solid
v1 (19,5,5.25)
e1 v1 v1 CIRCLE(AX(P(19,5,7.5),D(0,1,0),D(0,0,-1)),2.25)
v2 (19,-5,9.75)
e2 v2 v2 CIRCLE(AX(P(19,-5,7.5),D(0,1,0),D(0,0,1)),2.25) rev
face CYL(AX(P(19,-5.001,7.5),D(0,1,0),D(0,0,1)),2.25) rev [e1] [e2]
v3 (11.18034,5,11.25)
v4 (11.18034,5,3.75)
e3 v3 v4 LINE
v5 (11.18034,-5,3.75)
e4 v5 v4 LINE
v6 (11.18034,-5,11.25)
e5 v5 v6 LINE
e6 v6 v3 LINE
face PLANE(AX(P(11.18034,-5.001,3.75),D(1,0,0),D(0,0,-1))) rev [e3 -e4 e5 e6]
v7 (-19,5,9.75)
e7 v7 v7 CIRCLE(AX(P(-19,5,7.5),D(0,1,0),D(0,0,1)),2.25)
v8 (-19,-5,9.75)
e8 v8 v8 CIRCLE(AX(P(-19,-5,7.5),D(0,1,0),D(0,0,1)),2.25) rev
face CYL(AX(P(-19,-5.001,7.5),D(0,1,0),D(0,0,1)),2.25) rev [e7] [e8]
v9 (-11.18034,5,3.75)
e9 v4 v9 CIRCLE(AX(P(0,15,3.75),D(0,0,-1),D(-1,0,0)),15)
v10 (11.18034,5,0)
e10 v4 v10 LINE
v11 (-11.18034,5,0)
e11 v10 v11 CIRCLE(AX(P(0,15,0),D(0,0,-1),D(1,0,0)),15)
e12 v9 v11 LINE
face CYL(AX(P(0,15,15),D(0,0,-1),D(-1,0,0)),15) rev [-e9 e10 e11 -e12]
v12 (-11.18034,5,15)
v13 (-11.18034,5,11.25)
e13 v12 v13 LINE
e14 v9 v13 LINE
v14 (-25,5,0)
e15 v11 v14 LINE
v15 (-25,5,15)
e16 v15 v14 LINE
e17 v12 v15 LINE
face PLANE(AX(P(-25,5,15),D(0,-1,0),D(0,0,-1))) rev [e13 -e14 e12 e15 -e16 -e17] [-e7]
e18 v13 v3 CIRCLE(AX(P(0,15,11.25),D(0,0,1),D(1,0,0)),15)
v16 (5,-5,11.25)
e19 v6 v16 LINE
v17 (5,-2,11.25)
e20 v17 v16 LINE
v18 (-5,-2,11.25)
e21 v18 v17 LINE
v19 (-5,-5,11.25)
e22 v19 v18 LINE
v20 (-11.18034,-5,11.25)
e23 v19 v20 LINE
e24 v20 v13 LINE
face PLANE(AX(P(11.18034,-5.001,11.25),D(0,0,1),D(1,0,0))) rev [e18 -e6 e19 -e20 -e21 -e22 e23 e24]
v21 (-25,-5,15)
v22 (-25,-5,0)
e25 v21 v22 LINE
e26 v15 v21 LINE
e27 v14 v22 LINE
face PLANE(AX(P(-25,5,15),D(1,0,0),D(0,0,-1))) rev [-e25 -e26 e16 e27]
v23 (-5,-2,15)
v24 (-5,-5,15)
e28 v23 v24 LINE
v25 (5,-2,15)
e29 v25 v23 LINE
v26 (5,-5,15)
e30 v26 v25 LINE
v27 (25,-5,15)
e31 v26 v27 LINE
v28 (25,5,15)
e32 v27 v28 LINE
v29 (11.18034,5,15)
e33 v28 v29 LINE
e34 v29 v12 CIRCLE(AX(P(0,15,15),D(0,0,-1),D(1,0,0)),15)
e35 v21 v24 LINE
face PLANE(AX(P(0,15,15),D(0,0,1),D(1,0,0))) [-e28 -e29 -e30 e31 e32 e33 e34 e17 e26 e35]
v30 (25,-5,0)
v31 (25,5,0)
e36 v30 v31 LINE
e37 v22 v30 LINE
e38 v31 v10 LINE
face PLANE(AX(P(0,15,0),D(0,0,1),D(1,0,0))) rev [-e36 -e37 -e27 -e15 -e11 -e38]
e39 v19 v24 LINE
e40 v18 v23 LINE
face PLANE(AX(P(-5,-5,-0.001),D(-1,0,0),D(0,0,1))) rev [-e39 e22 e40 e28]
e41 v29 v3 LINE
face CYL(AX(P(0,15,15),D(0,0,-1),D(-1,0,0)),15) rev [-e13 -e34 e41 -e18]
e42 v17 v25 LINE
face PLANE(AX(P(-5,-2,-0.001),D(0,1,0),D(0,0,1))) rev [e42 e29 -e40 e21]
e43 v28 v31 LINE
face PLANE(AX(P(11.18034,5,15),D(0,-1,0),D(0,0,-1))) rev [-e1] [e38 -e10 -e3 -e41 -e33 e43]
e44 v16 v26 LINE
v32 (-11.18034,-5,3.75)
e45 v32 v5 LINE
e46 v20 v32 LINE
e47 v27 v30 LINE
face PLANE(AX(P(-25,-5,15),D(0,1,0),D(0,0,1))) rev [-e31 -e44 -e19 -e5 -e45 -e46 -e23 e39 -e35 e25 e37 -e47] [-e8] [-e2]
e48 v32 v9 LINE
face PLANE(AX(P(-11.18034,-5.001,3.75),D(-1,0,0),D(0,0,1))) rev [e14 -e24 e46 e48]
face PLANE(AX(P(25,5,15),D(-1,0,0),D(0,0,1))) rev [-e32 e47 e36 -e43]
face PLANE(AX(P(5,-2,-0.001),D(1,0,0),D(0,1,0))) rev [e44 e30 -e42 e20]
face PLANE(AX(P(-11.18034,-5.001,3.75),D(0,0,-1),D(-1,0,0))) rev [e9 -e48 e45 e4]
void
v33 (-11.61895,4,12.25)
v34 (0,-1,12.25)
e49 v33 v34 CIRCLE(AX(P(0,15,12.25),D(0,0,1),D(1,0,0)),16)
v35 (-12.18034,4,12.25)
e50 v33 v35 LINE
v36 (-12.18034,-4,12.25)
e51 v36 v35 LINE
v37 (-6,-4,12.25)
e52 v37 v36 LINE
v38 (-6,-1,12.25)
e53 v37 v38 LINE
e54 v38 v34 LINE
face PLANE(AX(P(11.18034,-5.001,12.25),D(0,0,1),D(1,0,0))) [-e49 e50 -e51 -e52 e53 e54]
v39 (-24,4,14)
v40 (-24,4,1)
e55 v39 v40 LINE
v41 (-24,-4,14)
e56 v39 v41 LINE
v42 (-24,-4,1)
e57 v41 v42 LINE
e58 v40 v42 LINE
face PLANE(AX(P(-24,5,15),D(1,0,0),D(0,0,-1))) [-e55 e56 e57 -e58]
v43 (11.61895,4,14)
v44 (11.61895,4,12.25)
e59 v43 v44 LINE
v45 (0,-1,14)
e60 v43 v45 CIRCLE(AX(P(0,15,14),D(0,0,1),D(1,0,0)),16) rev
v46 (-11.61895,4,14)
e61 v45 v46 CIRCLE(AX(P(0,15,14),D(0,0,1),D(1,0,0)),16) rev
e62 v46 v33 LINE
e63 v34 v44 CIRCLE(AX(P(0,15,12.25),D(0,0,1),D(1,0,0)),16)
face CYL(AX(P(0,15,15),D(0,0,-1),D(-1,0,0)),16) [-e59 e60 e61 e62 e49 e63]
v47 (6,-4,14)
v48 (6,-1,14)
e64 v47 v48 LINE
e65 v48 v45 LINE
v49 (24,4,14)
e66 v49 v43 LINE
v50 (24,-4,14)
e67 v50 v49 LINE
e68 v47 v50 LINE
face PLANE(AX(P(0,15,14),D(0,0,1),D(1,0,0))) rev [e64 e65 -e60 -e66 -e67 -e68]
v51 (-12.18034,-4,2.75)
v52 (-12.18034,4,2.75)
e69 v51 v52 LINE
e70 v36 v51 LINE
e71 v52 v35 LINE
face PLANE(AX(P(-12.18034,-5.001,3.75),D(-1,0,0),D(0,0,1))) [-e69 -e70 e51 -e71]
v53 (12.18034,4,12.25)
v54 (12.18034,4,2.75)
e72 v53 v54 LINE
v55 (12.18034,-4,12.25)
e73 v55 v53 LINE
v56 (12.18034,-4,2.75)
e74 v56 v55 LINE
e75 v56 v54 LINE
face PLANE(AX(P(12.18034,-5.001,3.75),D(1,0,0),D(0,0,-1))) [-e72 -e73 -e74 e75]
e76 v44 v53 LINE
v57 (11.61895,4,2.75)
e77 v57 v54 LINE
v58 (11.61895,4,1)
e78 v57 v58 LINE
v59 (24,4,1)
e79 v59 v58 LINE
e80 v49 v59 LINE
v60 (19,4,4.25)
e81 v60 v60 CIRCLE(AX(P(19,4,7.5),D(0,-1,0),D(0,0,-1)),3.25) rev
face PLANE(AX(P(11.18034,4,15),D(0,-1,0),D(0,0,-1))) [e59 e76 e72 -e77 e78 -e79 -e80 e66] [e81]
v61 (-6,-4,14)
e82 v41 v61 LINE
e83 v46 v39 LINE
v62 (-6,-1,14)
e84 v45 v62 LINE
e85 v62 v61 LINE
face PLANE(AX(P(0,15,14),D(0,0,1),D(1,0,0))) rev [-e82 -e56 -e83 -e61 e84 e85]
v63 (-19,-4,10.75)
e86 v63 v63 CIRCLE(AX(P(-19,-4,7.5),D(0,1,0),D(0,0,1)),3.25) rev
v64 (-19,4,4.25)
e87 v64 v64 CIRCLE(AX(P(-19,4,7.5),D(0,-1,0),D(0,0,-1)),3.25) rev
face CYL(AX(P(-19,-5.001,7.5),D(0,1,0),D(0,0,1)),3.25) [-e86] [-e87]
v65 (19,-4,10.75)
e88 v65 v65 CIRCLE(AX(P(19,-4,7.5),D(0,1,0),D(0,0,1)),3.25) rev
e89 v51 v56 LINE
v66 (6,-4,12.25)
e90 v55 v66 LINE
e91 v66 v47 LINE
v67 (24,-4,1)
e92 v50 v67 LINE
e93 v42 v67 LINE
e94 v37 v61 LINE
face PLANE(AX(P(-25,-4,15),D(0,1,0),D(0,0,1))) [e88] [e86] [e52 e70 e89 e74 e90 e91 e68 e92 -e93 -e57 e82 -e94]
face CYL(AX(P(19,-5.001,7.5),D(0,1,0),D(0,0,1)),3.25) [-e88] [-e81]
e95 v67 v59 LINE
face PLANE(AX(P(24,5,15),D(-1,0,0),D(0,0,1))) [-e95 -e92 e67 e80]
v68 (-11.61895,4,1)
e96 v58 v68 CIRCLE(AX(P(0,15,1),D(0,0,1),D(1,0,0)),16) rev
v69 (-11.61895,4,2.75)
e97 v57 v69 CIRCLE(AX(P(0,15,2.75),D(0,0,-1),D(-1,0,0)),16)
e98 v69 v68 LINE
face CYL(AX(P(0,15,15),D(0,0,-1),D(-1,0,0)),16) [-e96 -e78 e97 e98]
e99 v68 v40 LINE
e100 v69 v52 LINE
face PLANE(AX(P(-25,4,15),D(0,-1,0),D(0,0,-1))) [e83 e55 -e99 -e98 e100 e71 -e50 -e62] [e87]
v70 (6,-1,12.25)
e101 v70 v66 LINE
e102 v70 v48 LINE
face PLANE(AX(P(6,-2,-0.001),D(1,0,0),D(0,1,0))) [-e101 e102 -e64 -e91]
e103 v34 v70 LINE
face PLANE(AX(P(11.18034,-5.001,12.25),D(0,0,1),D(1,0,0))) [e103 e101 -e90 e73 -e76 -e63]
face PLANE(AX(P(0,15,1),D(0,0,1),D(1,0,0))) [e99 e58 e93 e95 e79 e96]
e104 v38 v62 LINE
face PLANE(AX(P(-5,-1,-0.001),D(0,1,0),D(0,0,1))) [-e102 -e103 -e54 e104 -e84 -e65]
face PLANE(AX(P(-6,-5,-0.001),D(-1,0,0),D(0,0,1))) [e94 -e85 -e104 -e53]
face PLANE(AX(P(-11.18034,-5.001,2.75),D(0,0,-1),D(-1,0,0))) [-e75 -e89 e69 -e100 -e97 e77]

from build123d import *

# Parameters (mm, degrees)
BOSS_EXTRUDE1_DEPTH = 15
CUT_EXTRUDE1_REACH  = 32.822
SKETCH3_W           = 22.360679774
SKETCH3_H           = 7.5
CUT_EXTRUDE2_REACH  = 31.58
SKETCH2_W           = 10
SKETCH2_H           = 3
CUT_EXTRUDE3_REACH  = 32.822
SKETCH4_R           = 2.25
SHELL2_START        = 1
SHELL2_OUTLINE_W    = 11.819660113
SHELL2_OUTLINE_H    = 8
SHELL2_DEPTH        = 3.2499999
SHELL2_START_2      = 10.7500001
SHELL2_2_OUTLINE_W  = 11.819660113
SHELL2_2_OUTLINE_H  = 8
SHELL2_2_DEPTH      = 3.2499999
SHELL2_3_DEPTH      = 1.75
SHELL2_START_3      = 12.25
SHELL2_4_DEPTH      = 1.75
SHELL2_START_4      = -4
SHELL2_5_DEPTH      = 8


with BuildPart() as part:
    # Sketch1 → Boss-Extrude1 (new body)
    with BuildSketch(Plane.XY):
        with BuildLine():
            Line((-25, 5), (-11.180339887, 5))
            ThreePointArc((-11.180339887, 5), (0, 0), (11.180339887, 5))
            Line((11.180339887, 5), (25, 5))
            Line((25, 5), (25, -5))
            Line((25, -5), (-25, -5))
            Line((-25, -5), (-25, 5))
        make_face()
    extrude(amount=BOSS_EXTRUDE1_DEPTH)

    # Sketch3 → Cut-Extrude1 (cut, up to next)
    with BuildSketch(Plane(origin=(0, 5, 0), x_dir=(1, 0, 0), z_dir=(0, 1, 0)), mode=Mode.PRIVATE) as cut_extrude1_sk1:
        with Locations((0, -7.5)):
            Rectangle(SKETCH3_W, SKETCH3_H)
    cut_extrude1_tool1 = extrude(cut_extrude1_sk1.sketch, amount=-CUT_EXTRUDE1_REACH, mode=Mode.PRIVATE) & part.part
    add(cut_extrude1_tool1.solids().sort_by_distance((0, 5, 7.5))[0], mode=Mode.SUBTRACT)

    # Sketch2 → Cut-Extrude2 (cut, up to next)
    with BuildSketch(Plane.XY.offset(15), mode=Mode.PRIVATE) as cut_extrude2_sk1:
        with Locations((0, -3.5)):
            Rectangle(SKETCH2_W, SKETCH2_H)
    cut_extrude2_tool1 = extrude(cut_extrude2_sk1.sketch, amount=-CUT_EXTRUDE2_REACH, mode=Mode.PRIVATE) & part.part
    add(cut_extrude2_tool1.solids().sort_by_distance((0, -3.5, 15))[0], mode=Mode.SUBTRACT)

    # Sketch4 → Cut-Extrude3 (cut, up to next)
    with BuildSketch(Plane(origin=(0, 5, 0), x_dir=(1, 0, 0), z_dir=(0, 1, 0)), mode=Mode.PRIVATE) as cut_extrude3_sk1:
        with Locations(Location((-19, -7.5, 0), (0, 0, 270))):
            Circle(SKETCH4_R)
    cut_extrude3_tool1 = extrude(cut_extrude3_sk1.sketch, amount=-CUT_EXTRUDE3_REACH, mode=Mode.PRIVATE) & part.part
    # Sketch4 → Cut-Extrude3 (cut, up to next)
    with BuildSketch(Plane(origin=(0, 5, 0), x_dir=(1, 0, 0), z_dir=(0, 1, 0)), mode=Mode.PRIVATE) as cut_extrude3_sk2:
        with Locations(Location((19, -7.5, 0), (0, 0, 270))):
            Circle(SKETCH4_R)
    cut_extrude3_tool2 = extrude(cut_extrude3_sk2.sketch, amount=-CUT_EXTRUDE3_REACH, mode=Mode.PRIVATE) & part.part
    add(cut_extrude3_tool1.solids().sort_by_distance((-19, 5, 7.5))[0], mode=Mode.SUBTRACT)
    add(cut_extrude3_tool2.solids().sort_by_distance((19, 5, 7.5))[0], mode=Mode.SUBTRACT)

    # Shell2: read off the stored shape, not the designer's step
    # Shell2 outline → Shell2 (cut)
    with BuildSketch(Plane.XY.offset(SHELL2_START)):
        with Locations((18.090169944, 0)):
            Rectangle(SHELL2_OUTLINE_W, SHELL2_OUTLINE_H)
        with Locations((-18.090169944, 0)):
            Rectangle(SHELL2_OUTLINE_W, SHELL2_OUTLINE_H)
    extrude(amount=SHELL2_DEPTH, mode=Mode.SUBTRACT)

    # Shell2 2 outline → Shell2 2 (cut)
    with BuildSketch(Plane.XY.offset(SHELL2_START_2)):
        with Locations((18.090169944, 0)):
            Rectangle(SHELL2_2_OUTLINE_W, SHELL2_2_OUTLINE_H)
        with Locations((-18.090169944, 0)):
            Rectangle(SHELL2_2_OUTLINE_W, SHELL2_2_OUTLINE_H)
    extrude(amount=SHELL2_2_DEPTH, mode=Mode.SUBTRACT)

    # Shell2 3 outline → Shell2 3 (cut)
    with BuildSketch(Plane.XY.offset(SHELL2_START)):
        with BuildLine():
            Line((12.180339887, 4), (11.618950039, 4))
            ThreePointArc((11.618950039, 4), (0, -1), (-11.618950039, 4))
            Line((-11.618950039, 4), (-12.180339887, 4))
            Line((-12.180339887, 4), (-12.180339887, -4))
            Line((-12.180339887, -4), (12.180339887, -4))
            Line((12.180339887, -4), (12.180339887, 4))
        make_face()
    extrude(amount=SHELL2_3_DEPTH, mode=Mode.SUBTRACT)

    # Shell2 4 outline → Shell2 4 (cut)
    with BuildSketch(Plane.XY.offset(SHELL2_START_3)):
        with BuildLine():
            Line((12.180339887, 4), (11.618950039, 4))
            ThreePointArc((11.618950039, 4), (6.324555321, 0.303061543), (0, -1))
            Line((0, -1), (6, -1))
            Line((6, -1), (6, -4))
            Line((6, -4), (12.180339887, -4))
            Line((12.180339887, -4), (12.180339887, 4))
        make_face()
        with BuildLine():
            Line((-6, -1), (0, -1))
            ThreePointArc((0, -1), (-6.324555321, 0.303061543), (-11.618950039, 4))
            Line((-11.618950039, 4), (-12.180339887, 4))
            Line((-12.180339887, 4), (-12.180339887, -4))
            Line((-12.180339887, -4), (-6, -4))
            Line((-6, -4), (-6, -1))
        make_face()
    extrude(amount=SHELL2_4_DEPTH, mode=Mode.SUBTRACT)

    # Shell2 5 outline → Shell2 5 (cut)
    with BuildSketch(Plane(origin=(0, 0, 0), x_dir=(1, 0, 0), z_dir=(0, 1, 0)).offset(SHELL2_START_4)):
        with BuildLine():
            Line((24, -10.7500001), (24, -4.2499999))
            Line((24, -4.2499999), (19, -4.25))
            ThreePointArc((19, -4.25), (22.25, -7.5), (19, -10.75))
            Line((19, -10.75), (24, -10.7500001))
        make_face()
        with BuildLine():
            ThreePointArc((19, -10.75), (15.75, -7.5), (19, -4.25))
            Line((19, -4.25), (12.180339887, -4.2499999))
            Line((12.180339887, -4.2499999), (12.180339887, -10.7500001))
            Line((12.180339887, -10.7500001), (19, -10.75))
        make_face()
        with BuildLine():
            Line((-24, -4.2499999), (-24, -10.7500001))
            Line((-24, -10.7500001), (-19, -10.75))
            ThreePointArc((-19, -10.75), (-22.25, -7.5), (-19, -4.25))
            Line((-19, -4.25), (-24, -4.2499999))
        make_face()
        with BuildLine():
            ThreePointArc((-19, -4.25), (-15.75, -7.5), (-19, -10.75))
            Line((-19, -10.75), (-12.180339887, -10.7500001))
            Line((-12.180339887, -10.7500001), (-12.180339887, -4.2499999))
            Line((-12.180339887, -4.2499999), (-19, -4.25))
        make_face()
    extrude(amount=SHELL2_5_DEPTH, mode=Mode.SUBTRACT)


solid = part.part
